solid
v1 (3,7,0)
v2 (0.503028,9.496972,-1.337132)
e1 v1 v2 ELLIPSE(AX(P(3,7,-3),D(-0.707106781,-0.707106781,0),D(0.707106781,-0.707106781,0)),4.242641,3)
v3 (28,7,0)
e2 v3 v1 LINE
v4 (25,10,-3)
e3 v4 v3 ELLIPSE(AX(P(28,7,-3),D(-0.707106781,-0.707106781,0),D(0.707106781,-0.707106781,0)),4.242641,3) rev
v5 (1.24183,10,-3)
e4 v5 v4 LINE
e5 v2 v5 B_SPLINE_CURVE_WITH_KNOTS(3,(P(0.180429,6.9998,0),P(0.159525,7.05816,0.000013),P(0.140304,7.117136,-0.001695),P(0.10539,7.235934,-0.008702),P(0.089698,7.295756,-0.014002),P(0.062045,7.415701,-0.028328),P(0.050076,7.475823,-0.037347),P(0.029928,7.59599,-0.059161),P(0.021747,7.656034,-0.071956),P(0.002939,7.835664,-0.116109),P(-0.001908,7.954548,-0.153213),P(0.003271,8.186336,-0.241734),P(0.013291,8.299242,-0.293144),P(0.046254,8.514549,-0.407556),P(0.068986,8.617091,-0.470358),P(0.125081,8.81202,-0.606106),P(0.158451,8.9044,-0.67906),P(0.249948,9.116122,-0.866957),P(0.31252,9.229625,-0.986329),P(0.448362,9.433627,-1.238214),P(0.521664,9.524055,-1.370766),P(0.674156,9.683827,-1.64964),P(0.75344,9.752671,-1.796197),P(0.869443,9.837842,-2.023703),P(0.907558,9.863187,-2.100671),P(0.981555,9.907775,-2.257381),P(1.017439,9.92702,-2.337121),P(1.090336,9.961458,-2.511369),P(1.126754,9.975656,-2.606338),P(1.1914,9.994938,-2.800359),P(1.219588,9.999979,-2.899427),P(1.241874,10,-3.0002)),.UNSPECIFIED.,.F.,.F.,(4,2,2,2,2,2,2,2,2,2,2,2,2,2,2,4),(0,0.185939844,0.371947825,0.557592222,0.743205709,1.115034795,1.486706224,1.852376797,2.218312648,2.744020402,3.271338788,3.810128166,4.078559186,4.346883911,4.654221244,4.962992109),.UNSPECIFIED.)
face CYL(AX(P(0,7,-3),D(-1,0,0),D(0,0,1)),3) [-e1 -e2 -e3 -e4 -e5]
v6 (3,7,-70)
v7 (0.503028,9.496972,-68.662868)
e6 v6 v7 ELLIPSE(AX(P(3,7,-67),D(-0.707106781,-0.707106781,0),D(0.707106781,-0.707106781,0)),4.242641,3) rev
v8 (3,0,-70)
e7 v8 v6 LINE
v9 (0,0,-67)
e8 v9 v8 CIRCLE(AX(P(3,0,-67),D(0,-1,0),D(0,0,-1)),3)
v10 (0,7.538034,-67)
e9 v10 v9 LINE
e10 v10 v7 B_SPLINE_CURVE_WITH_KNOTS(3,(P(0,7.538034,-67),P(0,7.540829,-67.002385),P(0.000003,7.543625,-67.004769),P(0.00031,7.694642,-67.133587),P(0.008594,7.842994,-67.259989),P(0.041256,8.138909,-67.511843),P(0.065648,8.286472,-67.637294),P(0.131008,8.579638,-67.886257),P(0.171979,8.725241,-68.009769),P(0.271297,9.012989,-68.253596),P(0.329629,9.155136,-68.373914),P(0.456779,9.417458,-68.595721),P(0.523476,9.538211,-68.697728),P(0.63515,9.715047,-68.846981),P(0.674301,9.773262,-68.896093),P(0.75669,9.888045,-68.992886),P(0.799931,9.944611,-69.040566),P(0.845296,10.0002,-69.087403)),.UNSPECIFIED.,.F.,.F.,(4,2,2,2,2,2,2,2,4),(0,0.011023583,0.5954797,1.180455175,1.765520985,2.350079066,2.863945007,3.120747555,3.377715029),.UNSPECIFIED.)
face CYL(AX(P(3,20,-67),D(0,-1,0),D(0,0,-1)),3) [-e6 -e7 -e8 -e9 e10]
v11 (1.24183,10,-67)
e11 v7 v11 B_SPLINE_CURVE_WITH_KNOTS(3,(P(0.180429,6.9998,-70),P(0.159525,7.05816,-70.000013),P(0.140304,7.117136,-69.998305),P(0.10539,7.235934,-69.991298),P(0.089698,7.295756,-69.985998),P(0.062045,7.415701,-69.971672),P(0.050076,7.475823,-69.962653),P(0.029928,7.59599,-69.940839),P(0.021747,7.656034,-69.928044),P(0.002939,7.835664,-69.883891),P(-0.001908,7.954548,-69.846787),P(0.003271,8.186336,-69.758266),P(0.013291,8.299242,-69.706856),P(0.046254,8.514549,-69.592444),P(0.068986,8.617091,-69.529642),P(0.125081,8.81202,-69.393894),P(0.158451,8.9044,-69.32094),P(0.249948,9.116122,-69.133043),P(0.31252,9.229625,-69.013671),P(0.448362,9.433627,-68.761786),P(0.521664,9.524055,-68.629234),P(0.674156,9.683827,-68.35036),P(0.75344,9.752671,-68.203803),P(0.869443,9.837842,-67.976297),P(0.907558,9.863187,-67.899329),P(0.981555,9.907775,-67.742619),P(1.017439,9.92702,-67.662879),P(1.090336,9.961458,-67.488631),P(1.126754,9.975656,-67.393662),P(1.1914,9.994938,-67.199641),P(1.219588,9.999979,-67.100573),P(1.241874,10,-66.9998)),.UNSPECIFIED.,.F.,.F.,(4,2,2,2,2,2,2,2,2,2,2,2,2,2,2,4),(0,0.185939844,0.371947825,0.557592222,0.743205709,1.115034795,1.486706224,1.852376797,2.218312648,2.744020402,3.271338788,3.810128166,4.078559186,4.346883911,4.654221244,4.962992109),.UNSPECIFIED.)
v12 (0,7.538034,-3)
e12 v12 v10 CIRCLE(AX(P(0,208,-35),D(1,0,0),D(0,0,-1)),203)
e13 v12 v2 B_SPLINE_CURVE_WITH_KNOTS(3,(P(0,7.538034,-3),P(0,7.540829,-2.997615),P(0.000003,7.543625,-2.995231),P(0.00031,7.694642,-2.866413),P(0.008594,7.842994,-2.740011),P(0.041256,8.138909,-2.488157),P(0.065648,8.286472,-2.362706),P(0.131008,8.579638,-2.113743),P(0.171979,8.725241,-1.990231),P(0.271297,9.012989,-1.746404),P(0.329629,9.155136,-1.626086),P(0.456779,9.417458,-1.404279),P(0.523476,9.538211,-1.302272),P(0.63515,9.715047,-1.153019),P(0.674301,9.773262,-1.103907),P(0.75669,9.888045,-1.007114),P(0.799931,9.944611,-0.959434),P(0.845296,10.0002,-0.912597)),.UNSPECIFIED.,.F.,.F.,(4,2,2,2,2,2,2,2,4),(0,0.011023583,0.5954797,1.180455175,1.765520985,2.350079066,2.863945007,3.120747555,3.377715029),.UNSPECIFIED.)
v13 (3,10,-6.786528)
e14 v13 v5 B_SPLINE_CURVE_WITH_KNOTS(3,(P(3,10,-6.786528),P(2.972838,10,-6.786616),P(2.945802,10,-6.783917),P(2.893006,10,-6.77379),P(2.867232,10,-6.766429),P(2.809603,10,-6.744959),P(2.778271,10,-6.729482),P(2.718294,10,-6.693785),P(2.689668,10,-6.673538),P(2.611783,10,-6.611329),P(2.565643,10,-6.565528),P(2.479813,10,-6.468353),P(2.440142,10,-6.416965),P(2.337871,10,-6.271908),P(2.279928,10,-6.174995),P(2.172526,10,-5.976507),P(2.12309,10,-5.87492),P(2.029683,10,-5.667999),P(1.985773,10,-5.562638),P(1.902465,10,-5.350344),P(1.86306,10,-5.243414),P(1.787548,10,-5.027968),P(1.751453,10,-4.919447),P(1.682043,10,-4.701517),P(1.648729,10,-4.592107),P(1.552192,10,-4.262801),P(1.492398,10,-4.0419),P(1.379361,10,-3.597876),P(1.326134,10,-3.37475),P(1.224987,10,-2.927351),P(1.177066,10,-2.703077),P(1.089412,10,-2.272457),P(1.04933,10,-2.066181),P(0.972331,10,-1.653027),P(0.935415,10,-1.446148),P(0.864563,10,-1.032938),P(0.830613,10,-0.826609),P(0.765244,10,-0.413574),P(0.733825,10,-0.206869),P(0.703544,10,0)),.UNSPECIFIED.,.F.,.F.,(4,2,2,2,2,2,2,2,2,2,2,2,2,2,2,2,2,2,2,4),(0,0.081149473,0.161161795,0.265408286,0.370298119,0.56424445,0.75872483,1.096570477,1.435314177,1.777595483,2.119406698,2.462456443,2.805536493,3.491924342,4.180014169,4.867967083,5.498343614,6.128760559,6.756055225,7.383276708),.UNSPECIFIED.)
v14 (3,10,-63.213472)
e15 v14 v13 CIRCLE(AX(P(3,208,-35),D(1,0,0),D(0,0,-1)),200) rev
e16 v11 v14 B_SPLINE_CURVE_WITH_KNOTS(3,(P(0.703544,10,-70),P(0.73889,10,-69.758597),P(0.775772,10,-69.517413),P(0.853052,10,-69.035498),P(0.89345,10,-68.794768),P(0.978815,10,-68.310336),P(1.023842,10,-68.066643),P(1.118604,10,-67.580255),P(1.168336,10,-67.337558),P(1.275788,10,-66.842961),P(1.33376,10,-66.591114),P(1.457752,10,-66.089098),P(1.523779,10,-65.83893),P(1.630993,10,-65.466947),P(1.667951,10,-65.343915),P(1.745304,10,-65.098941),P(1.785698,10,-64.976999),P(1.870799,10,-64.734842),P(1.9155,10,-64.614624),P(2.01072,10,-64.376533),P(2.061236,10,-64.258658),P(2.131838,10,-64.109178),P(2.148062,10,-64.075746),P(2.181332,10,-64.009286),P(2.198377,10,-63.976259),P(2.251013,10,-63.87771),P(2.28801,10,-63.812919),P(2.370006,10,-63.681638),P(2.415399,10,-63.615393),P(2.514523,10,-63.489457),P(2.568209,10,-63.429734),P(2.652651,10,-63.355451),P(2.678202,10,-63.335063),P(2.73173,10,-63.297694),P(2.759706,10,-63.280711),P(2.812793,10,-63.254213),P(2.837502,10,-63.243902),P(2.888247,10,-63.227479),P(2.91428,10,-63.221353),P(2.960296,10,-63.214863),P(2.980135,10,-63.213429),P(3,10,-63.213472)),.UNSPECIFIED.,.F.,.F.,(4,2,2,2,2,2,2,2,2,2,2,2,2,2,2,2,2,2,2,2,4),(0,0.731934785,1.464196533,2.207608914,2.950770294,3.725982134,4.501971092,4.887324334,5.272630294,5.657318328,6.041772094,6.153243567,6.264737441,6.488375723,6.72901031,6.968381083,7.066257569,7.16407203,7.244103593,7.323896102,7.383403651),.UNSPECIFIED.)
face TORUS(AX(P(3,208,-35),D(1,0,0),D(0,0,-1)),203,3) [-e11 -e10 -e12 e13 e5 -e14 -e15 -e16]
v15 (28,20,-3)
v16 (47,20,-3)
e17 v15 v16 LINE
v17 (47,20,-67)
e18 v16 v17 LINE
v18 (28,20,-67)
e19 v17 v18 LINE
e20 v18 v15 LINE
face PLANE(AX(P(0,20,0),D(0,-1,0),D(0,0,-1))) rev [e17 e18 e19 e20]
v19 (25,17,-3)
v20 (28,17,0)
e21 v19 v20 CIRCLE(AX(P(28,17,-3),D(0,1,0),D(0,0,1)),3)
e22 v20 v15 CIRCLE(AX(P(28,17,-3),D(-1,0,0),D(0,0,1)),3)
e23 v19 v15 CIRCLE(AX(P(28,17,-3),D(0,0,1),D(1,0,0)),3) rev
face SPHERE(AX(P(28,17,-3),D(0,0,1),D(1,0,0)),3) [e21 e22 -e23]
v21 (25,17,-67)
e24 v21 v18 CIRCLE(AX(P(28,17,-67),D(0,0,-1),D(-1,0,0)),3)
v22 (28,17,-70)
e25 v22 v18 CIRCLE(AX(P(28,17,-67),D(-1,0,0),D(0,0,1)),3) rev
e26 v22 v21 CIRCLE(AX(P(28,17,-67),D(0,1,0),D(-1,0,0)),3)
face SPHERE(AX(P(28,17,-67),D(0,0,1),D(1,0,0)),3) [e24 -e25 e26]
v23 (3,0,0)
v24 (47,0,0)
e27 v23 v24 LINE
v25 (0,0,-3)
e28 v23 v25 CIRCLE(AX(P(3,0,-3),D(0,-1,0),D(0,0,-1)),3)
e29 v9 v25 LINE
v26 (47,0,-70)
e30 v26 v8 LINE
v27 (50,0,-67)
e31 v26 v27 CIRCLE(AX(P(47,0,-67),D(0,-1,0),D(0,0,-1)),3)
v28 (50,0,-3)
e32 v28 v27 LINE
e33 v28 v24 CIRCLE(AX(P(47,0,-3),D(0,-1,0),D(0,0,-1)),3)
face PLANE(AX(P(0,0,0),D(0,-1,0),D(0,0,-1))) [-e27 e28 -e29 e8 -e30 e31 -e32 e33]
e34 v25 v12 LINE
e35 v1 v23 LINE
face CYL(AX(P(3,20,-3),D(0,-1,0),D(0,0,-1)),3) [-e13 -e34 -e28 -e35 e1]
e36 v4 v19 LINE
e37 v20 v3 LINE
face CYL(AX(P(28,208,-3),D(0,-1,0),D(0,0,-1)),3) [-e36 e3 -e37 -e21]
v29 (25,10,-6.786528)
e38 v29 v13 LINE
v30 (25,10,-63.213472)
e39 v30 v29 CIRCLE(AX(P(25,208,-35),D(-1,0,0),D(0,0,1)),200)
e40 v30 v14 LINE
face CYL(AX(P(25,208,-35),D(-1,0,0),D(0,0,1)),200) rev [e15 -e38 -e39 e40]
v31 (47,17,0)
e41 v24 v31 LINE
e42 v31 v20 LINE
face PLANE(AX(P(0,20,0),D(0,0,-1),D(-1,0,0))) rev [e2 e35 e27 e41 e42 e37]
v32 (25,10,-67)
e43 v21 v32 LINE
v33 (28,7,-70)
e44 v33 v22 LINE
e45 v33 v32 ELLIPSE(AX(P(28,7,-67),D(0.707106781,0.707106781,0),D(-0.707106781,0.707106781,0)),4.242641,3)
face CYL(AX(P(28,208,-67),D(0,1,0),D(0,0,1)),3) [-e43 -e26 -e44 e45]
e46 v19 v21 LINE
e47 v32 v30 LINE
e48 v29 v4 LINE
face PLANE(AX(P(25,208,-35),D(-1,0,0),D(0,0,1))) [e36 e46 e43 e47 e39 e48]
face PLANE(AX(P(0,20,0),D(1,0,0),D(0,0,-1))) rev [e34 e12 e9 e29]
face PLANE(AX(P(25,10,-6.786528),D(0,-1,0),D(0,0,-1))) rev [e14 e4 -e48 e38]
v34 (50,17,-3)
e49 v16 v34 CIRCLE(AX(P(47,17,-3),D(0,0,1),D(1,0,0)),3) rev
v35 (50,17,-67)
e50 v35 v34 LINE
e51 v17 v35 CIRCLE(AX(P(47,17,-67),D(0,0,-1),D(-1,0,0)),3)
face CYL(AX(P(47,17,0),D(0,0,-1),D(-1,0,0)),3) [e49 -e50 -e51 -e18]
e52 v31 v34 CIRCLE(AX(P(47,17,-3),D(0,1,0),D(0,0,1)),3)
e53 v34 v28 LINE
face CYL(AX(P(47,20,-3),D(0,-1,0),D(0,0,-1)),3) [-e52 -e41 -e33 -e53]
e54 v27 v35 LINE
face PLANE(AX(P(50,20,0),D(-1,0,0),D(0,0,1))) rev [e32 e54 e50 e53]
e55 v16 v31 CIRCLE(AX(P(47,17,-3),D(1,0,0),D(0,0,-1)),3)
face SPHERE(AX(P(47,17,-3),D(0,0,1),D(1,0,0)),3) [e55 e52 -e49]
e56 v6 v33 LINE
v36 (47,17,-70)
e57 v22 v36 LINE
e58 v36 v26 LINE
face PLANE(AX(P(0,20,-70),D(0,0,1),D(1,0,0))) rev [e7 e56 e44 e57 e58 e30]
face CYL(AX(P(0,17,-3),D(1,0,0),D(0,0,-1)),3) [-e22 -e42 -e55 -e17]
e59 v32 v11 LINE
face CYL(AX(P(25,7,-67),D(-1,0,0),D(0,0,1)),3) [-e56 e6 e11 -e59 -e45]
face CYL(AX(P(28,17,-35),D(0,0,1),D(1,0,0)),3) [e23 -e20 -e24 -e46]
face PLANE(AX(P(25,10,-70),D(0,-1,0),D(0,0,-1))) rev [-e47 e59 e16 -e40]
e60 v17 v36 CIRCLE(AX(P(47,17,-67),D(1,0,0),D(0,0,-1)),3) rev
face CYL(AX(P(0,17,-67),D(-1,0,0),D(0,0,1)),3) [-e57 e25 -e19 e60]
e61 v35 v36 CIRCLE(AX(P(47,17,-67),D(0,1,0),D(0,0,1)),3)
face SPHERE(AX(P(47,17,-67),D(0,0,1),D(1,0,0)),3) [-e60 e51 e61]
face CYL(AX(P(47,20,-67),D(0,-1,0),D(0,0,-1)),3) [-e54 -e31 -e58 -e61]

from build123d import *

# Parameters (mm, degrees)
SKETCH1_W           = 50
SKETCH1_H           = 70
BOSS_EXTRUDE1_DEPTH = 20
CUT_EXTRUDE1_DEPTH  = 25
FILLET1_R           = 3


with BuildPart() as part:
    # Sketch1 → Boss-Extrude1 (new body)
    with BuildSketch(Plane(origin=(0, 0, 0), x_dir=(1, 0, 0), z_dir=(0, 1, 0))):
        with Locations((25, 35)):
            Rectangle(SKETCH1_W, SKETCH1_H)
    extrude(amount=BOSS_EXTRUDE1_DEPTH)

    # Sketch3 → Cut-Extrude1 (cut)
    with BuildSketch(Plane.ZY):
        with BuildLine():
            Line((-70, 20), (0, 20))
            Line((0, 20), (0, 10))
            Line((0, 10), (-6.786528041, 10))
            ThreePointArc((-6.786528041, 10), (-35, 8), (-63.213471959, 10))
            Line((-63.213471959, 10), (-70, 10))
            Line((-70, 10), (-70, 20))
        make_face()
    extrude(amount=-CUT_EXTRUDE1_DEPTH, mode=Mode.SUBTRACT)

    # Fillet1
    # the kernel refuses this fillet: 3 mm, written as the material it takes off along each edge
    with BuildSketch(Plane(origin=(28, 17, -67), x_dir=(-1, 0, 0), z_dir=(0, 1, 0))) as fillet1_piece_1_section:
        Polygon((0, 0), (FILLET1_R, 0), (FILLET1_R, -FILLET1_R), (0, -FILLET1_R), align=None)
    fillet1_piece_1 = extrude(amount=FILLET1_R, mode=Mode.PRIVATE)
    fillet1_piece_1 = fillet1_piece_1 - Plane(origin=(28, 17, -67), x_dir=(0.7071067811865475, 0, 0.7071067811865475), z_dir=(0, 1, 0)) * Sphere(FILLET1_R, mode=Mode.PRIVATE)
    add(fillet1_piece_1, mode=Mode.SUBTRACT)
    with BuildSketch(Plane(origin=(28, 17, -3), x_dir=(0, 1, 0), z_dir=(0, 0, 1))) as fillet1_piece_2_section:
        Polygon((0, 0), (FILLET1_R, 0), (FILLET1_R, FILLET1_R), (0, FILLET1_R), align=None)
    fillet1_piece_2 = extrude(amount=FILLET1_R, mode=Mode.PRIVATE)
    fillet1_piece_2 = fillet1_piece_2 - Plane(origin=(28, 17, -3), x_dir=(0.7071067811865475, -0.7071067811865475, 0), z_dir=(0, 0, 1)) * Sphere(FILLET1_R, mode=Mode.PRIVATE)
    add(fillet1_piece_2, mode=Mode.SUBTRACT)
    with BuildSketch(Plane(origin=(47, 17, -67), x_dir=(0, 1, 0), z_dir=(1, 0, 0))) as fillet1_piece_3_section:
        Polygon((0, 0), (FILLET1_R, 0), (FILLET1_R, -FILLET1_R), (0, -FILLET1_R), align=None)
    fillet1_piece_3 = extrude(amount=FILLET1_R, mode=Mode.PRIVATE)
    fillet1_piece_3 = fillet1_piece_3 - Plane(origin=(47, 17, -67), x_dir=(0, -0.7071067811865475, 0.7071067811865475), z_dir=(1, 0, 0)) * Sphere(FILLET1_R, mode=Mode.PRIVATE)
    add(fillet1_piece_3, mode=Mode.SUBTRACT)
    with BuildSketch(Plane(origin=(47, 17, -3), x_dir=(1, 0, 0), z_dir=(0, 0, 1))) as fillet1_piece_4_section:
        Polygon((0, 0), (FILLET1_R, 0), (FILLET1_R, FILLET1_R), (0, FILLET1_R), align=None)
    fillet1_piece_4 = extrude(amount=FILLET1_R, mode=Mode.PRIVATE)
    fillet1_piece_4 = fillet1_piece_4 - Plane(origin=(47, 17, -3), x_dir=(-0.7071067811865475, -0.7071067811865475, 0), z_dir=(0, 0, 1)) * Sphere(FILLET1_R, mode=Mode.PRIVATE)
    add(fillet1_piece_4, mode=Mode.SUBTRACT)
    with BuildSketch(Plane(origin=(25, 10, -70), x_dir=(0, 0, 1), z_dir=(0, 1, 0))) as fillet1_piece_5:
        with BuildLine():
            CenterArc((FILLET1_R, FILLET1_R), FILLET1_R, 180, 90)
            Line((0, FILLET1_R), (0, 0))
            Line((0, 0), (FILLET1_R, 0))
        make_face()
    extrude(amount=7, mode=Mode.SUBTRACT)
    with BuildSketch(Plane(origin=(25, 17, 0), x_dir=(1, 0, 0), z_dir=(0, -1, 0))) as fillet1_piece_6:
        with BuildLine():
            CenterArc((FILLET1_R, -FILLET1_R), FILLET1_R, 90, 90)
            Line((0, -FILLET1_R), (0, 0))
            Line((0, 0), (FILLET1_R, 0))
        make_face()
    extrude(amount=7, mode=Mode.SUBTRACT)
    with BuildSketch(Plane(origin=(-7.5, 10, -70), x_dir=(0, -1, 0), z_dir=(1, 0, 0))) as fillet1_piece_7:
        with BuildLine():
            CenterArc((FILLET1_R, -FILLET1_R), FILLET1_R, 90, 90)
            Line((0, -FILLET1_R), (0, 0))
            Line((0, 0), (FILLET1_R, 0))
        make_face()
    extrude(amount=32.5, mode=Mode.SUBTRACT)
    with BuildSketch(Plane(origin=(0, 208, -35), x_dir=(0, -0.9840151144884159, 0.17808496415573608), z_dir=(0, 0.17808496415573608, 0.9840151144884159))) as fillet1_piece_8:
        with BuildLine():
            CenterArc((200 + FILLET1_R, FILLET1_R), FILLET1_R, 180, 90)
            Line((200, FILLET1_R), (200, 0))
            Line((200, 0), (200 + FILLET1_R, 0))
        make_face()
    revolve(axis=Axis((0, 208, -35), (1, 0, 0)), revolution_arc=20.516468422, mode=Mode.SUBTRACT)
    with BuildSketch(Plane(origin=(-7.5, 10, 0), x_dir=(0, -1, 0), z_dir=(1, 0, 0))) as fillet1_piece_9:
        with BuildLine():
            CenterArc((FILLET1_R, FILLET1_R), FILLET1_R, 180, 90)
            Line((0, FILLET1_R), (0, 0))
            Line((0, 0), (FILLET1_R, 0))
        make_face()
    extrude(amount=32.5, mode=Mode.SUBTRACT)
    with BuildSketch(Plane(origin=(47, 20, -70), x_dir=(0, 0, 1), z_dir=(-1, 0, 0))) as fillet1_piece_10:
        with BuildLine():
            CenterArc((FILLET1_R, -FILLET1_R), FILLET1_R, 90, 90)
            Line((0, -FILLET1_R), (0, 0))
            Line((0, 0), (FILLET1_R, 0))
        make_face()
    extrude(amount=19, mode=Mode.SUBTRACT)
    with BuildSketch(Plane(origin=(50, 20, -3), x_dir=(0, -1, 0), z_dir=(0, 0, -1))) as fillet1_piece_11:
        with BuildLine():
            CenterArc((FILLET1_R, FILLET1_R), FILLET1_R, 180, 90)
            Line((0, FILLET1_R), (0, 0))
            Line((0, 0), (FILLET1_R, 0))
        make_face()
    extrude(amount=64, mode=Mode.SUBTRACT)
    with BuildSketch(Plane(origin=(28, 20, 0), x_dir=(0, -1, 0), z_dir=(1, 0, 0))) as fillet1_piece_12:
        with BuildLine():
            CenterArc((FILLET1_R, FILLET1_R), FILLET1_R, 180, 90)
            Line((0, FILLET1_R), (0, 0))
            Line((0, 0), (FILLET1_R, 0))
        make_face()
    extrude(amount=19, mode=Mode.SUBTRACT)
    with BuildSketch(Plane(origin=(25, 20, -67), x_dir=(1, 0, 0), z_dir=(0, 0, 1))) as fillet1_piece_13:
        with BuildLine():
            CenterArc((FILLET1_R, -FILLET1_R), FILLET1_R, 90, 90)
            Line((0, -FILLET1_R), (0, 0))
            Line((0, 0), (FILLET1_R, 0))
        make_face()
    extrude(amount=64, mode=Mode.SUBTRACT)
    with BuildSketch(Plane(origin=(0, -7.5, 0), x_dir=(1, 0, 0), z_dir=(0, 1, 0)), Plane(origin=(0, -7.5, -70), x_dir=(0, 0, 1), z_dir=(0, 1, 0))) as fillet1_piece_14:
        with BuildLine():
            CenterArc((FILLET1_R, FILLET1_R), FILLET1_R, 180, 90)
            Line((0, FILLET1_R), (0, 0))
            Line((0, 0), (FILLET1_R, 0))
        make_face()
    extrude(amount=25, mode=Mode.SUBTRACT)
    with BuildSketch(Plane(origin=(50, -7.5, -70), x_dir=(0, 0, 1), z_dir=(0, 1, 0)), Plane(origin=(50, -7.5, 0), x_dir=(-1, 0, 0), z_dir=(0, 1, 0))) as fillet1_piece_15:
        with BuildLine():
            CenterArc((FILLET1_R, -FILLET1_R), FILLET1_R, 90, 90)
            Line((0, -FILLET1_R), (0, 0))
            Line((0, 0), (FILLET1_R, 0))
        make_face()
    extrude(amount=24.5, mode=Mode.SUBTRACT)
    with BuildSketch(Plane(origin=(25, 2.5, -70), x_dir=(0, 0, 1), z_dir=(0, 1, 0))) as fillet1_piece_16a_section:
        with BuildLine():
            CenterArc((FILLET1_R, FILLET1_R), FILLET1_R, 180, 90)
            Line((0, FILLET1_R), (0, 0))
            Line((0, 0), (FILLET1_R, 0))
        make_face()
    fillet1_piece_16a = extrude(amount=14.5, mode=Mode.PRIVATE)
    fillet1_piece_16a = split(fillet1_piece_16a, bisect_by=Plane(origin=(25.679185343, 10, -69.320814657), z_dir=(0, -1, 0)), keep=Keep.TOP, mode=Mode.PRIVATE)
    with BuildSketch(Plane(origin=(-7.5, 10, -70), x_dir=(0, -1, 0), z_dir=(1, 0, 0))) as fillet1_piece_16b_section:
        with BuildLine():
            CenterArc((FILLET1_R, -FILLET1_R), FILLET1_R, 90, 90)
            Line((0, -FILLET1_R), (0, 0))
            Line((0, 0), (FILLET1_R, 0))
        make_face()
    fillet1_piece_16b = extrude(amount=40, mode=Mode.PRIVATE)
    fillet1_piece_16b = split(fillet1_piece_16b, bisect_by=Plane(origin=(25, 9.320814657, -69.320814657), z_dir=(1, 0, 0)), keep=Keep.TOP, mode=Mode.PRIVATE)
    fillet1_piece_16 = fillet1_piece_16a & fillet1_piece_16b
    add(fillet1_piece_16, mode=Mode.SUBTRACT)
    with BuildSketch(Plane(origin=(25, 17, 0), x_dir=(1, 0, 0), z_dir=(0, -1, 0))) as fillet1_piece_17a_section:
        with BuildLine():
            CenterArc((FILLET1_R, -FILLET1_R), FILLET1_R, 90, 90)
            Line((0, -FILLET1_R), (0, 0))
            Line((0, 0), (FILLET1_R, 0))
        make_face()
    fillet1_piece_17a = extrude(amount=14.5, mode=Mode.PRIVATE)
    fillet1_piece_17a = split(fillet1_piece_17a, bisect_by=Plane(origin=(25.679185343, 10, -0.679185343), z_dir=(0, -1, 0)), keep=Keep.TOP, mode=Mode.PRIVATE)
    with BuildSketch(Plane(origin=(-7.5, 10, 0), x_dir=(0, -1, 0), z_dir=(1, 0, 0))) as fillet1_piece_17b_section:
        with BuildLine():
            CenterArc((FILLET1_R, FILLET1_R), FILLET1_R, 180, 90)
            Line((0, FILLET1_R), (0, 0))
            Line((0, 0), (FILLET1_R, 0))
        make_face()
    fillet1_piece_17b = extrude(amount=40, mode=Mode.PRIVATE)
    fillet1_piece_17b = split(fillet1_piece_17b, bisect_by=Plane(origin=(25, 9.320814657, -0.679185343), z_dir=(1, 0, 0)), keep=Keep.TOP, mode=Mode.PRIVATE)
    fillet1_piece_17 = fillet1_piece_17a & fillet1_piece_17b
    add(fillet1_piece_17, mode=Mode.SUBTRACT)


solid = part.part
